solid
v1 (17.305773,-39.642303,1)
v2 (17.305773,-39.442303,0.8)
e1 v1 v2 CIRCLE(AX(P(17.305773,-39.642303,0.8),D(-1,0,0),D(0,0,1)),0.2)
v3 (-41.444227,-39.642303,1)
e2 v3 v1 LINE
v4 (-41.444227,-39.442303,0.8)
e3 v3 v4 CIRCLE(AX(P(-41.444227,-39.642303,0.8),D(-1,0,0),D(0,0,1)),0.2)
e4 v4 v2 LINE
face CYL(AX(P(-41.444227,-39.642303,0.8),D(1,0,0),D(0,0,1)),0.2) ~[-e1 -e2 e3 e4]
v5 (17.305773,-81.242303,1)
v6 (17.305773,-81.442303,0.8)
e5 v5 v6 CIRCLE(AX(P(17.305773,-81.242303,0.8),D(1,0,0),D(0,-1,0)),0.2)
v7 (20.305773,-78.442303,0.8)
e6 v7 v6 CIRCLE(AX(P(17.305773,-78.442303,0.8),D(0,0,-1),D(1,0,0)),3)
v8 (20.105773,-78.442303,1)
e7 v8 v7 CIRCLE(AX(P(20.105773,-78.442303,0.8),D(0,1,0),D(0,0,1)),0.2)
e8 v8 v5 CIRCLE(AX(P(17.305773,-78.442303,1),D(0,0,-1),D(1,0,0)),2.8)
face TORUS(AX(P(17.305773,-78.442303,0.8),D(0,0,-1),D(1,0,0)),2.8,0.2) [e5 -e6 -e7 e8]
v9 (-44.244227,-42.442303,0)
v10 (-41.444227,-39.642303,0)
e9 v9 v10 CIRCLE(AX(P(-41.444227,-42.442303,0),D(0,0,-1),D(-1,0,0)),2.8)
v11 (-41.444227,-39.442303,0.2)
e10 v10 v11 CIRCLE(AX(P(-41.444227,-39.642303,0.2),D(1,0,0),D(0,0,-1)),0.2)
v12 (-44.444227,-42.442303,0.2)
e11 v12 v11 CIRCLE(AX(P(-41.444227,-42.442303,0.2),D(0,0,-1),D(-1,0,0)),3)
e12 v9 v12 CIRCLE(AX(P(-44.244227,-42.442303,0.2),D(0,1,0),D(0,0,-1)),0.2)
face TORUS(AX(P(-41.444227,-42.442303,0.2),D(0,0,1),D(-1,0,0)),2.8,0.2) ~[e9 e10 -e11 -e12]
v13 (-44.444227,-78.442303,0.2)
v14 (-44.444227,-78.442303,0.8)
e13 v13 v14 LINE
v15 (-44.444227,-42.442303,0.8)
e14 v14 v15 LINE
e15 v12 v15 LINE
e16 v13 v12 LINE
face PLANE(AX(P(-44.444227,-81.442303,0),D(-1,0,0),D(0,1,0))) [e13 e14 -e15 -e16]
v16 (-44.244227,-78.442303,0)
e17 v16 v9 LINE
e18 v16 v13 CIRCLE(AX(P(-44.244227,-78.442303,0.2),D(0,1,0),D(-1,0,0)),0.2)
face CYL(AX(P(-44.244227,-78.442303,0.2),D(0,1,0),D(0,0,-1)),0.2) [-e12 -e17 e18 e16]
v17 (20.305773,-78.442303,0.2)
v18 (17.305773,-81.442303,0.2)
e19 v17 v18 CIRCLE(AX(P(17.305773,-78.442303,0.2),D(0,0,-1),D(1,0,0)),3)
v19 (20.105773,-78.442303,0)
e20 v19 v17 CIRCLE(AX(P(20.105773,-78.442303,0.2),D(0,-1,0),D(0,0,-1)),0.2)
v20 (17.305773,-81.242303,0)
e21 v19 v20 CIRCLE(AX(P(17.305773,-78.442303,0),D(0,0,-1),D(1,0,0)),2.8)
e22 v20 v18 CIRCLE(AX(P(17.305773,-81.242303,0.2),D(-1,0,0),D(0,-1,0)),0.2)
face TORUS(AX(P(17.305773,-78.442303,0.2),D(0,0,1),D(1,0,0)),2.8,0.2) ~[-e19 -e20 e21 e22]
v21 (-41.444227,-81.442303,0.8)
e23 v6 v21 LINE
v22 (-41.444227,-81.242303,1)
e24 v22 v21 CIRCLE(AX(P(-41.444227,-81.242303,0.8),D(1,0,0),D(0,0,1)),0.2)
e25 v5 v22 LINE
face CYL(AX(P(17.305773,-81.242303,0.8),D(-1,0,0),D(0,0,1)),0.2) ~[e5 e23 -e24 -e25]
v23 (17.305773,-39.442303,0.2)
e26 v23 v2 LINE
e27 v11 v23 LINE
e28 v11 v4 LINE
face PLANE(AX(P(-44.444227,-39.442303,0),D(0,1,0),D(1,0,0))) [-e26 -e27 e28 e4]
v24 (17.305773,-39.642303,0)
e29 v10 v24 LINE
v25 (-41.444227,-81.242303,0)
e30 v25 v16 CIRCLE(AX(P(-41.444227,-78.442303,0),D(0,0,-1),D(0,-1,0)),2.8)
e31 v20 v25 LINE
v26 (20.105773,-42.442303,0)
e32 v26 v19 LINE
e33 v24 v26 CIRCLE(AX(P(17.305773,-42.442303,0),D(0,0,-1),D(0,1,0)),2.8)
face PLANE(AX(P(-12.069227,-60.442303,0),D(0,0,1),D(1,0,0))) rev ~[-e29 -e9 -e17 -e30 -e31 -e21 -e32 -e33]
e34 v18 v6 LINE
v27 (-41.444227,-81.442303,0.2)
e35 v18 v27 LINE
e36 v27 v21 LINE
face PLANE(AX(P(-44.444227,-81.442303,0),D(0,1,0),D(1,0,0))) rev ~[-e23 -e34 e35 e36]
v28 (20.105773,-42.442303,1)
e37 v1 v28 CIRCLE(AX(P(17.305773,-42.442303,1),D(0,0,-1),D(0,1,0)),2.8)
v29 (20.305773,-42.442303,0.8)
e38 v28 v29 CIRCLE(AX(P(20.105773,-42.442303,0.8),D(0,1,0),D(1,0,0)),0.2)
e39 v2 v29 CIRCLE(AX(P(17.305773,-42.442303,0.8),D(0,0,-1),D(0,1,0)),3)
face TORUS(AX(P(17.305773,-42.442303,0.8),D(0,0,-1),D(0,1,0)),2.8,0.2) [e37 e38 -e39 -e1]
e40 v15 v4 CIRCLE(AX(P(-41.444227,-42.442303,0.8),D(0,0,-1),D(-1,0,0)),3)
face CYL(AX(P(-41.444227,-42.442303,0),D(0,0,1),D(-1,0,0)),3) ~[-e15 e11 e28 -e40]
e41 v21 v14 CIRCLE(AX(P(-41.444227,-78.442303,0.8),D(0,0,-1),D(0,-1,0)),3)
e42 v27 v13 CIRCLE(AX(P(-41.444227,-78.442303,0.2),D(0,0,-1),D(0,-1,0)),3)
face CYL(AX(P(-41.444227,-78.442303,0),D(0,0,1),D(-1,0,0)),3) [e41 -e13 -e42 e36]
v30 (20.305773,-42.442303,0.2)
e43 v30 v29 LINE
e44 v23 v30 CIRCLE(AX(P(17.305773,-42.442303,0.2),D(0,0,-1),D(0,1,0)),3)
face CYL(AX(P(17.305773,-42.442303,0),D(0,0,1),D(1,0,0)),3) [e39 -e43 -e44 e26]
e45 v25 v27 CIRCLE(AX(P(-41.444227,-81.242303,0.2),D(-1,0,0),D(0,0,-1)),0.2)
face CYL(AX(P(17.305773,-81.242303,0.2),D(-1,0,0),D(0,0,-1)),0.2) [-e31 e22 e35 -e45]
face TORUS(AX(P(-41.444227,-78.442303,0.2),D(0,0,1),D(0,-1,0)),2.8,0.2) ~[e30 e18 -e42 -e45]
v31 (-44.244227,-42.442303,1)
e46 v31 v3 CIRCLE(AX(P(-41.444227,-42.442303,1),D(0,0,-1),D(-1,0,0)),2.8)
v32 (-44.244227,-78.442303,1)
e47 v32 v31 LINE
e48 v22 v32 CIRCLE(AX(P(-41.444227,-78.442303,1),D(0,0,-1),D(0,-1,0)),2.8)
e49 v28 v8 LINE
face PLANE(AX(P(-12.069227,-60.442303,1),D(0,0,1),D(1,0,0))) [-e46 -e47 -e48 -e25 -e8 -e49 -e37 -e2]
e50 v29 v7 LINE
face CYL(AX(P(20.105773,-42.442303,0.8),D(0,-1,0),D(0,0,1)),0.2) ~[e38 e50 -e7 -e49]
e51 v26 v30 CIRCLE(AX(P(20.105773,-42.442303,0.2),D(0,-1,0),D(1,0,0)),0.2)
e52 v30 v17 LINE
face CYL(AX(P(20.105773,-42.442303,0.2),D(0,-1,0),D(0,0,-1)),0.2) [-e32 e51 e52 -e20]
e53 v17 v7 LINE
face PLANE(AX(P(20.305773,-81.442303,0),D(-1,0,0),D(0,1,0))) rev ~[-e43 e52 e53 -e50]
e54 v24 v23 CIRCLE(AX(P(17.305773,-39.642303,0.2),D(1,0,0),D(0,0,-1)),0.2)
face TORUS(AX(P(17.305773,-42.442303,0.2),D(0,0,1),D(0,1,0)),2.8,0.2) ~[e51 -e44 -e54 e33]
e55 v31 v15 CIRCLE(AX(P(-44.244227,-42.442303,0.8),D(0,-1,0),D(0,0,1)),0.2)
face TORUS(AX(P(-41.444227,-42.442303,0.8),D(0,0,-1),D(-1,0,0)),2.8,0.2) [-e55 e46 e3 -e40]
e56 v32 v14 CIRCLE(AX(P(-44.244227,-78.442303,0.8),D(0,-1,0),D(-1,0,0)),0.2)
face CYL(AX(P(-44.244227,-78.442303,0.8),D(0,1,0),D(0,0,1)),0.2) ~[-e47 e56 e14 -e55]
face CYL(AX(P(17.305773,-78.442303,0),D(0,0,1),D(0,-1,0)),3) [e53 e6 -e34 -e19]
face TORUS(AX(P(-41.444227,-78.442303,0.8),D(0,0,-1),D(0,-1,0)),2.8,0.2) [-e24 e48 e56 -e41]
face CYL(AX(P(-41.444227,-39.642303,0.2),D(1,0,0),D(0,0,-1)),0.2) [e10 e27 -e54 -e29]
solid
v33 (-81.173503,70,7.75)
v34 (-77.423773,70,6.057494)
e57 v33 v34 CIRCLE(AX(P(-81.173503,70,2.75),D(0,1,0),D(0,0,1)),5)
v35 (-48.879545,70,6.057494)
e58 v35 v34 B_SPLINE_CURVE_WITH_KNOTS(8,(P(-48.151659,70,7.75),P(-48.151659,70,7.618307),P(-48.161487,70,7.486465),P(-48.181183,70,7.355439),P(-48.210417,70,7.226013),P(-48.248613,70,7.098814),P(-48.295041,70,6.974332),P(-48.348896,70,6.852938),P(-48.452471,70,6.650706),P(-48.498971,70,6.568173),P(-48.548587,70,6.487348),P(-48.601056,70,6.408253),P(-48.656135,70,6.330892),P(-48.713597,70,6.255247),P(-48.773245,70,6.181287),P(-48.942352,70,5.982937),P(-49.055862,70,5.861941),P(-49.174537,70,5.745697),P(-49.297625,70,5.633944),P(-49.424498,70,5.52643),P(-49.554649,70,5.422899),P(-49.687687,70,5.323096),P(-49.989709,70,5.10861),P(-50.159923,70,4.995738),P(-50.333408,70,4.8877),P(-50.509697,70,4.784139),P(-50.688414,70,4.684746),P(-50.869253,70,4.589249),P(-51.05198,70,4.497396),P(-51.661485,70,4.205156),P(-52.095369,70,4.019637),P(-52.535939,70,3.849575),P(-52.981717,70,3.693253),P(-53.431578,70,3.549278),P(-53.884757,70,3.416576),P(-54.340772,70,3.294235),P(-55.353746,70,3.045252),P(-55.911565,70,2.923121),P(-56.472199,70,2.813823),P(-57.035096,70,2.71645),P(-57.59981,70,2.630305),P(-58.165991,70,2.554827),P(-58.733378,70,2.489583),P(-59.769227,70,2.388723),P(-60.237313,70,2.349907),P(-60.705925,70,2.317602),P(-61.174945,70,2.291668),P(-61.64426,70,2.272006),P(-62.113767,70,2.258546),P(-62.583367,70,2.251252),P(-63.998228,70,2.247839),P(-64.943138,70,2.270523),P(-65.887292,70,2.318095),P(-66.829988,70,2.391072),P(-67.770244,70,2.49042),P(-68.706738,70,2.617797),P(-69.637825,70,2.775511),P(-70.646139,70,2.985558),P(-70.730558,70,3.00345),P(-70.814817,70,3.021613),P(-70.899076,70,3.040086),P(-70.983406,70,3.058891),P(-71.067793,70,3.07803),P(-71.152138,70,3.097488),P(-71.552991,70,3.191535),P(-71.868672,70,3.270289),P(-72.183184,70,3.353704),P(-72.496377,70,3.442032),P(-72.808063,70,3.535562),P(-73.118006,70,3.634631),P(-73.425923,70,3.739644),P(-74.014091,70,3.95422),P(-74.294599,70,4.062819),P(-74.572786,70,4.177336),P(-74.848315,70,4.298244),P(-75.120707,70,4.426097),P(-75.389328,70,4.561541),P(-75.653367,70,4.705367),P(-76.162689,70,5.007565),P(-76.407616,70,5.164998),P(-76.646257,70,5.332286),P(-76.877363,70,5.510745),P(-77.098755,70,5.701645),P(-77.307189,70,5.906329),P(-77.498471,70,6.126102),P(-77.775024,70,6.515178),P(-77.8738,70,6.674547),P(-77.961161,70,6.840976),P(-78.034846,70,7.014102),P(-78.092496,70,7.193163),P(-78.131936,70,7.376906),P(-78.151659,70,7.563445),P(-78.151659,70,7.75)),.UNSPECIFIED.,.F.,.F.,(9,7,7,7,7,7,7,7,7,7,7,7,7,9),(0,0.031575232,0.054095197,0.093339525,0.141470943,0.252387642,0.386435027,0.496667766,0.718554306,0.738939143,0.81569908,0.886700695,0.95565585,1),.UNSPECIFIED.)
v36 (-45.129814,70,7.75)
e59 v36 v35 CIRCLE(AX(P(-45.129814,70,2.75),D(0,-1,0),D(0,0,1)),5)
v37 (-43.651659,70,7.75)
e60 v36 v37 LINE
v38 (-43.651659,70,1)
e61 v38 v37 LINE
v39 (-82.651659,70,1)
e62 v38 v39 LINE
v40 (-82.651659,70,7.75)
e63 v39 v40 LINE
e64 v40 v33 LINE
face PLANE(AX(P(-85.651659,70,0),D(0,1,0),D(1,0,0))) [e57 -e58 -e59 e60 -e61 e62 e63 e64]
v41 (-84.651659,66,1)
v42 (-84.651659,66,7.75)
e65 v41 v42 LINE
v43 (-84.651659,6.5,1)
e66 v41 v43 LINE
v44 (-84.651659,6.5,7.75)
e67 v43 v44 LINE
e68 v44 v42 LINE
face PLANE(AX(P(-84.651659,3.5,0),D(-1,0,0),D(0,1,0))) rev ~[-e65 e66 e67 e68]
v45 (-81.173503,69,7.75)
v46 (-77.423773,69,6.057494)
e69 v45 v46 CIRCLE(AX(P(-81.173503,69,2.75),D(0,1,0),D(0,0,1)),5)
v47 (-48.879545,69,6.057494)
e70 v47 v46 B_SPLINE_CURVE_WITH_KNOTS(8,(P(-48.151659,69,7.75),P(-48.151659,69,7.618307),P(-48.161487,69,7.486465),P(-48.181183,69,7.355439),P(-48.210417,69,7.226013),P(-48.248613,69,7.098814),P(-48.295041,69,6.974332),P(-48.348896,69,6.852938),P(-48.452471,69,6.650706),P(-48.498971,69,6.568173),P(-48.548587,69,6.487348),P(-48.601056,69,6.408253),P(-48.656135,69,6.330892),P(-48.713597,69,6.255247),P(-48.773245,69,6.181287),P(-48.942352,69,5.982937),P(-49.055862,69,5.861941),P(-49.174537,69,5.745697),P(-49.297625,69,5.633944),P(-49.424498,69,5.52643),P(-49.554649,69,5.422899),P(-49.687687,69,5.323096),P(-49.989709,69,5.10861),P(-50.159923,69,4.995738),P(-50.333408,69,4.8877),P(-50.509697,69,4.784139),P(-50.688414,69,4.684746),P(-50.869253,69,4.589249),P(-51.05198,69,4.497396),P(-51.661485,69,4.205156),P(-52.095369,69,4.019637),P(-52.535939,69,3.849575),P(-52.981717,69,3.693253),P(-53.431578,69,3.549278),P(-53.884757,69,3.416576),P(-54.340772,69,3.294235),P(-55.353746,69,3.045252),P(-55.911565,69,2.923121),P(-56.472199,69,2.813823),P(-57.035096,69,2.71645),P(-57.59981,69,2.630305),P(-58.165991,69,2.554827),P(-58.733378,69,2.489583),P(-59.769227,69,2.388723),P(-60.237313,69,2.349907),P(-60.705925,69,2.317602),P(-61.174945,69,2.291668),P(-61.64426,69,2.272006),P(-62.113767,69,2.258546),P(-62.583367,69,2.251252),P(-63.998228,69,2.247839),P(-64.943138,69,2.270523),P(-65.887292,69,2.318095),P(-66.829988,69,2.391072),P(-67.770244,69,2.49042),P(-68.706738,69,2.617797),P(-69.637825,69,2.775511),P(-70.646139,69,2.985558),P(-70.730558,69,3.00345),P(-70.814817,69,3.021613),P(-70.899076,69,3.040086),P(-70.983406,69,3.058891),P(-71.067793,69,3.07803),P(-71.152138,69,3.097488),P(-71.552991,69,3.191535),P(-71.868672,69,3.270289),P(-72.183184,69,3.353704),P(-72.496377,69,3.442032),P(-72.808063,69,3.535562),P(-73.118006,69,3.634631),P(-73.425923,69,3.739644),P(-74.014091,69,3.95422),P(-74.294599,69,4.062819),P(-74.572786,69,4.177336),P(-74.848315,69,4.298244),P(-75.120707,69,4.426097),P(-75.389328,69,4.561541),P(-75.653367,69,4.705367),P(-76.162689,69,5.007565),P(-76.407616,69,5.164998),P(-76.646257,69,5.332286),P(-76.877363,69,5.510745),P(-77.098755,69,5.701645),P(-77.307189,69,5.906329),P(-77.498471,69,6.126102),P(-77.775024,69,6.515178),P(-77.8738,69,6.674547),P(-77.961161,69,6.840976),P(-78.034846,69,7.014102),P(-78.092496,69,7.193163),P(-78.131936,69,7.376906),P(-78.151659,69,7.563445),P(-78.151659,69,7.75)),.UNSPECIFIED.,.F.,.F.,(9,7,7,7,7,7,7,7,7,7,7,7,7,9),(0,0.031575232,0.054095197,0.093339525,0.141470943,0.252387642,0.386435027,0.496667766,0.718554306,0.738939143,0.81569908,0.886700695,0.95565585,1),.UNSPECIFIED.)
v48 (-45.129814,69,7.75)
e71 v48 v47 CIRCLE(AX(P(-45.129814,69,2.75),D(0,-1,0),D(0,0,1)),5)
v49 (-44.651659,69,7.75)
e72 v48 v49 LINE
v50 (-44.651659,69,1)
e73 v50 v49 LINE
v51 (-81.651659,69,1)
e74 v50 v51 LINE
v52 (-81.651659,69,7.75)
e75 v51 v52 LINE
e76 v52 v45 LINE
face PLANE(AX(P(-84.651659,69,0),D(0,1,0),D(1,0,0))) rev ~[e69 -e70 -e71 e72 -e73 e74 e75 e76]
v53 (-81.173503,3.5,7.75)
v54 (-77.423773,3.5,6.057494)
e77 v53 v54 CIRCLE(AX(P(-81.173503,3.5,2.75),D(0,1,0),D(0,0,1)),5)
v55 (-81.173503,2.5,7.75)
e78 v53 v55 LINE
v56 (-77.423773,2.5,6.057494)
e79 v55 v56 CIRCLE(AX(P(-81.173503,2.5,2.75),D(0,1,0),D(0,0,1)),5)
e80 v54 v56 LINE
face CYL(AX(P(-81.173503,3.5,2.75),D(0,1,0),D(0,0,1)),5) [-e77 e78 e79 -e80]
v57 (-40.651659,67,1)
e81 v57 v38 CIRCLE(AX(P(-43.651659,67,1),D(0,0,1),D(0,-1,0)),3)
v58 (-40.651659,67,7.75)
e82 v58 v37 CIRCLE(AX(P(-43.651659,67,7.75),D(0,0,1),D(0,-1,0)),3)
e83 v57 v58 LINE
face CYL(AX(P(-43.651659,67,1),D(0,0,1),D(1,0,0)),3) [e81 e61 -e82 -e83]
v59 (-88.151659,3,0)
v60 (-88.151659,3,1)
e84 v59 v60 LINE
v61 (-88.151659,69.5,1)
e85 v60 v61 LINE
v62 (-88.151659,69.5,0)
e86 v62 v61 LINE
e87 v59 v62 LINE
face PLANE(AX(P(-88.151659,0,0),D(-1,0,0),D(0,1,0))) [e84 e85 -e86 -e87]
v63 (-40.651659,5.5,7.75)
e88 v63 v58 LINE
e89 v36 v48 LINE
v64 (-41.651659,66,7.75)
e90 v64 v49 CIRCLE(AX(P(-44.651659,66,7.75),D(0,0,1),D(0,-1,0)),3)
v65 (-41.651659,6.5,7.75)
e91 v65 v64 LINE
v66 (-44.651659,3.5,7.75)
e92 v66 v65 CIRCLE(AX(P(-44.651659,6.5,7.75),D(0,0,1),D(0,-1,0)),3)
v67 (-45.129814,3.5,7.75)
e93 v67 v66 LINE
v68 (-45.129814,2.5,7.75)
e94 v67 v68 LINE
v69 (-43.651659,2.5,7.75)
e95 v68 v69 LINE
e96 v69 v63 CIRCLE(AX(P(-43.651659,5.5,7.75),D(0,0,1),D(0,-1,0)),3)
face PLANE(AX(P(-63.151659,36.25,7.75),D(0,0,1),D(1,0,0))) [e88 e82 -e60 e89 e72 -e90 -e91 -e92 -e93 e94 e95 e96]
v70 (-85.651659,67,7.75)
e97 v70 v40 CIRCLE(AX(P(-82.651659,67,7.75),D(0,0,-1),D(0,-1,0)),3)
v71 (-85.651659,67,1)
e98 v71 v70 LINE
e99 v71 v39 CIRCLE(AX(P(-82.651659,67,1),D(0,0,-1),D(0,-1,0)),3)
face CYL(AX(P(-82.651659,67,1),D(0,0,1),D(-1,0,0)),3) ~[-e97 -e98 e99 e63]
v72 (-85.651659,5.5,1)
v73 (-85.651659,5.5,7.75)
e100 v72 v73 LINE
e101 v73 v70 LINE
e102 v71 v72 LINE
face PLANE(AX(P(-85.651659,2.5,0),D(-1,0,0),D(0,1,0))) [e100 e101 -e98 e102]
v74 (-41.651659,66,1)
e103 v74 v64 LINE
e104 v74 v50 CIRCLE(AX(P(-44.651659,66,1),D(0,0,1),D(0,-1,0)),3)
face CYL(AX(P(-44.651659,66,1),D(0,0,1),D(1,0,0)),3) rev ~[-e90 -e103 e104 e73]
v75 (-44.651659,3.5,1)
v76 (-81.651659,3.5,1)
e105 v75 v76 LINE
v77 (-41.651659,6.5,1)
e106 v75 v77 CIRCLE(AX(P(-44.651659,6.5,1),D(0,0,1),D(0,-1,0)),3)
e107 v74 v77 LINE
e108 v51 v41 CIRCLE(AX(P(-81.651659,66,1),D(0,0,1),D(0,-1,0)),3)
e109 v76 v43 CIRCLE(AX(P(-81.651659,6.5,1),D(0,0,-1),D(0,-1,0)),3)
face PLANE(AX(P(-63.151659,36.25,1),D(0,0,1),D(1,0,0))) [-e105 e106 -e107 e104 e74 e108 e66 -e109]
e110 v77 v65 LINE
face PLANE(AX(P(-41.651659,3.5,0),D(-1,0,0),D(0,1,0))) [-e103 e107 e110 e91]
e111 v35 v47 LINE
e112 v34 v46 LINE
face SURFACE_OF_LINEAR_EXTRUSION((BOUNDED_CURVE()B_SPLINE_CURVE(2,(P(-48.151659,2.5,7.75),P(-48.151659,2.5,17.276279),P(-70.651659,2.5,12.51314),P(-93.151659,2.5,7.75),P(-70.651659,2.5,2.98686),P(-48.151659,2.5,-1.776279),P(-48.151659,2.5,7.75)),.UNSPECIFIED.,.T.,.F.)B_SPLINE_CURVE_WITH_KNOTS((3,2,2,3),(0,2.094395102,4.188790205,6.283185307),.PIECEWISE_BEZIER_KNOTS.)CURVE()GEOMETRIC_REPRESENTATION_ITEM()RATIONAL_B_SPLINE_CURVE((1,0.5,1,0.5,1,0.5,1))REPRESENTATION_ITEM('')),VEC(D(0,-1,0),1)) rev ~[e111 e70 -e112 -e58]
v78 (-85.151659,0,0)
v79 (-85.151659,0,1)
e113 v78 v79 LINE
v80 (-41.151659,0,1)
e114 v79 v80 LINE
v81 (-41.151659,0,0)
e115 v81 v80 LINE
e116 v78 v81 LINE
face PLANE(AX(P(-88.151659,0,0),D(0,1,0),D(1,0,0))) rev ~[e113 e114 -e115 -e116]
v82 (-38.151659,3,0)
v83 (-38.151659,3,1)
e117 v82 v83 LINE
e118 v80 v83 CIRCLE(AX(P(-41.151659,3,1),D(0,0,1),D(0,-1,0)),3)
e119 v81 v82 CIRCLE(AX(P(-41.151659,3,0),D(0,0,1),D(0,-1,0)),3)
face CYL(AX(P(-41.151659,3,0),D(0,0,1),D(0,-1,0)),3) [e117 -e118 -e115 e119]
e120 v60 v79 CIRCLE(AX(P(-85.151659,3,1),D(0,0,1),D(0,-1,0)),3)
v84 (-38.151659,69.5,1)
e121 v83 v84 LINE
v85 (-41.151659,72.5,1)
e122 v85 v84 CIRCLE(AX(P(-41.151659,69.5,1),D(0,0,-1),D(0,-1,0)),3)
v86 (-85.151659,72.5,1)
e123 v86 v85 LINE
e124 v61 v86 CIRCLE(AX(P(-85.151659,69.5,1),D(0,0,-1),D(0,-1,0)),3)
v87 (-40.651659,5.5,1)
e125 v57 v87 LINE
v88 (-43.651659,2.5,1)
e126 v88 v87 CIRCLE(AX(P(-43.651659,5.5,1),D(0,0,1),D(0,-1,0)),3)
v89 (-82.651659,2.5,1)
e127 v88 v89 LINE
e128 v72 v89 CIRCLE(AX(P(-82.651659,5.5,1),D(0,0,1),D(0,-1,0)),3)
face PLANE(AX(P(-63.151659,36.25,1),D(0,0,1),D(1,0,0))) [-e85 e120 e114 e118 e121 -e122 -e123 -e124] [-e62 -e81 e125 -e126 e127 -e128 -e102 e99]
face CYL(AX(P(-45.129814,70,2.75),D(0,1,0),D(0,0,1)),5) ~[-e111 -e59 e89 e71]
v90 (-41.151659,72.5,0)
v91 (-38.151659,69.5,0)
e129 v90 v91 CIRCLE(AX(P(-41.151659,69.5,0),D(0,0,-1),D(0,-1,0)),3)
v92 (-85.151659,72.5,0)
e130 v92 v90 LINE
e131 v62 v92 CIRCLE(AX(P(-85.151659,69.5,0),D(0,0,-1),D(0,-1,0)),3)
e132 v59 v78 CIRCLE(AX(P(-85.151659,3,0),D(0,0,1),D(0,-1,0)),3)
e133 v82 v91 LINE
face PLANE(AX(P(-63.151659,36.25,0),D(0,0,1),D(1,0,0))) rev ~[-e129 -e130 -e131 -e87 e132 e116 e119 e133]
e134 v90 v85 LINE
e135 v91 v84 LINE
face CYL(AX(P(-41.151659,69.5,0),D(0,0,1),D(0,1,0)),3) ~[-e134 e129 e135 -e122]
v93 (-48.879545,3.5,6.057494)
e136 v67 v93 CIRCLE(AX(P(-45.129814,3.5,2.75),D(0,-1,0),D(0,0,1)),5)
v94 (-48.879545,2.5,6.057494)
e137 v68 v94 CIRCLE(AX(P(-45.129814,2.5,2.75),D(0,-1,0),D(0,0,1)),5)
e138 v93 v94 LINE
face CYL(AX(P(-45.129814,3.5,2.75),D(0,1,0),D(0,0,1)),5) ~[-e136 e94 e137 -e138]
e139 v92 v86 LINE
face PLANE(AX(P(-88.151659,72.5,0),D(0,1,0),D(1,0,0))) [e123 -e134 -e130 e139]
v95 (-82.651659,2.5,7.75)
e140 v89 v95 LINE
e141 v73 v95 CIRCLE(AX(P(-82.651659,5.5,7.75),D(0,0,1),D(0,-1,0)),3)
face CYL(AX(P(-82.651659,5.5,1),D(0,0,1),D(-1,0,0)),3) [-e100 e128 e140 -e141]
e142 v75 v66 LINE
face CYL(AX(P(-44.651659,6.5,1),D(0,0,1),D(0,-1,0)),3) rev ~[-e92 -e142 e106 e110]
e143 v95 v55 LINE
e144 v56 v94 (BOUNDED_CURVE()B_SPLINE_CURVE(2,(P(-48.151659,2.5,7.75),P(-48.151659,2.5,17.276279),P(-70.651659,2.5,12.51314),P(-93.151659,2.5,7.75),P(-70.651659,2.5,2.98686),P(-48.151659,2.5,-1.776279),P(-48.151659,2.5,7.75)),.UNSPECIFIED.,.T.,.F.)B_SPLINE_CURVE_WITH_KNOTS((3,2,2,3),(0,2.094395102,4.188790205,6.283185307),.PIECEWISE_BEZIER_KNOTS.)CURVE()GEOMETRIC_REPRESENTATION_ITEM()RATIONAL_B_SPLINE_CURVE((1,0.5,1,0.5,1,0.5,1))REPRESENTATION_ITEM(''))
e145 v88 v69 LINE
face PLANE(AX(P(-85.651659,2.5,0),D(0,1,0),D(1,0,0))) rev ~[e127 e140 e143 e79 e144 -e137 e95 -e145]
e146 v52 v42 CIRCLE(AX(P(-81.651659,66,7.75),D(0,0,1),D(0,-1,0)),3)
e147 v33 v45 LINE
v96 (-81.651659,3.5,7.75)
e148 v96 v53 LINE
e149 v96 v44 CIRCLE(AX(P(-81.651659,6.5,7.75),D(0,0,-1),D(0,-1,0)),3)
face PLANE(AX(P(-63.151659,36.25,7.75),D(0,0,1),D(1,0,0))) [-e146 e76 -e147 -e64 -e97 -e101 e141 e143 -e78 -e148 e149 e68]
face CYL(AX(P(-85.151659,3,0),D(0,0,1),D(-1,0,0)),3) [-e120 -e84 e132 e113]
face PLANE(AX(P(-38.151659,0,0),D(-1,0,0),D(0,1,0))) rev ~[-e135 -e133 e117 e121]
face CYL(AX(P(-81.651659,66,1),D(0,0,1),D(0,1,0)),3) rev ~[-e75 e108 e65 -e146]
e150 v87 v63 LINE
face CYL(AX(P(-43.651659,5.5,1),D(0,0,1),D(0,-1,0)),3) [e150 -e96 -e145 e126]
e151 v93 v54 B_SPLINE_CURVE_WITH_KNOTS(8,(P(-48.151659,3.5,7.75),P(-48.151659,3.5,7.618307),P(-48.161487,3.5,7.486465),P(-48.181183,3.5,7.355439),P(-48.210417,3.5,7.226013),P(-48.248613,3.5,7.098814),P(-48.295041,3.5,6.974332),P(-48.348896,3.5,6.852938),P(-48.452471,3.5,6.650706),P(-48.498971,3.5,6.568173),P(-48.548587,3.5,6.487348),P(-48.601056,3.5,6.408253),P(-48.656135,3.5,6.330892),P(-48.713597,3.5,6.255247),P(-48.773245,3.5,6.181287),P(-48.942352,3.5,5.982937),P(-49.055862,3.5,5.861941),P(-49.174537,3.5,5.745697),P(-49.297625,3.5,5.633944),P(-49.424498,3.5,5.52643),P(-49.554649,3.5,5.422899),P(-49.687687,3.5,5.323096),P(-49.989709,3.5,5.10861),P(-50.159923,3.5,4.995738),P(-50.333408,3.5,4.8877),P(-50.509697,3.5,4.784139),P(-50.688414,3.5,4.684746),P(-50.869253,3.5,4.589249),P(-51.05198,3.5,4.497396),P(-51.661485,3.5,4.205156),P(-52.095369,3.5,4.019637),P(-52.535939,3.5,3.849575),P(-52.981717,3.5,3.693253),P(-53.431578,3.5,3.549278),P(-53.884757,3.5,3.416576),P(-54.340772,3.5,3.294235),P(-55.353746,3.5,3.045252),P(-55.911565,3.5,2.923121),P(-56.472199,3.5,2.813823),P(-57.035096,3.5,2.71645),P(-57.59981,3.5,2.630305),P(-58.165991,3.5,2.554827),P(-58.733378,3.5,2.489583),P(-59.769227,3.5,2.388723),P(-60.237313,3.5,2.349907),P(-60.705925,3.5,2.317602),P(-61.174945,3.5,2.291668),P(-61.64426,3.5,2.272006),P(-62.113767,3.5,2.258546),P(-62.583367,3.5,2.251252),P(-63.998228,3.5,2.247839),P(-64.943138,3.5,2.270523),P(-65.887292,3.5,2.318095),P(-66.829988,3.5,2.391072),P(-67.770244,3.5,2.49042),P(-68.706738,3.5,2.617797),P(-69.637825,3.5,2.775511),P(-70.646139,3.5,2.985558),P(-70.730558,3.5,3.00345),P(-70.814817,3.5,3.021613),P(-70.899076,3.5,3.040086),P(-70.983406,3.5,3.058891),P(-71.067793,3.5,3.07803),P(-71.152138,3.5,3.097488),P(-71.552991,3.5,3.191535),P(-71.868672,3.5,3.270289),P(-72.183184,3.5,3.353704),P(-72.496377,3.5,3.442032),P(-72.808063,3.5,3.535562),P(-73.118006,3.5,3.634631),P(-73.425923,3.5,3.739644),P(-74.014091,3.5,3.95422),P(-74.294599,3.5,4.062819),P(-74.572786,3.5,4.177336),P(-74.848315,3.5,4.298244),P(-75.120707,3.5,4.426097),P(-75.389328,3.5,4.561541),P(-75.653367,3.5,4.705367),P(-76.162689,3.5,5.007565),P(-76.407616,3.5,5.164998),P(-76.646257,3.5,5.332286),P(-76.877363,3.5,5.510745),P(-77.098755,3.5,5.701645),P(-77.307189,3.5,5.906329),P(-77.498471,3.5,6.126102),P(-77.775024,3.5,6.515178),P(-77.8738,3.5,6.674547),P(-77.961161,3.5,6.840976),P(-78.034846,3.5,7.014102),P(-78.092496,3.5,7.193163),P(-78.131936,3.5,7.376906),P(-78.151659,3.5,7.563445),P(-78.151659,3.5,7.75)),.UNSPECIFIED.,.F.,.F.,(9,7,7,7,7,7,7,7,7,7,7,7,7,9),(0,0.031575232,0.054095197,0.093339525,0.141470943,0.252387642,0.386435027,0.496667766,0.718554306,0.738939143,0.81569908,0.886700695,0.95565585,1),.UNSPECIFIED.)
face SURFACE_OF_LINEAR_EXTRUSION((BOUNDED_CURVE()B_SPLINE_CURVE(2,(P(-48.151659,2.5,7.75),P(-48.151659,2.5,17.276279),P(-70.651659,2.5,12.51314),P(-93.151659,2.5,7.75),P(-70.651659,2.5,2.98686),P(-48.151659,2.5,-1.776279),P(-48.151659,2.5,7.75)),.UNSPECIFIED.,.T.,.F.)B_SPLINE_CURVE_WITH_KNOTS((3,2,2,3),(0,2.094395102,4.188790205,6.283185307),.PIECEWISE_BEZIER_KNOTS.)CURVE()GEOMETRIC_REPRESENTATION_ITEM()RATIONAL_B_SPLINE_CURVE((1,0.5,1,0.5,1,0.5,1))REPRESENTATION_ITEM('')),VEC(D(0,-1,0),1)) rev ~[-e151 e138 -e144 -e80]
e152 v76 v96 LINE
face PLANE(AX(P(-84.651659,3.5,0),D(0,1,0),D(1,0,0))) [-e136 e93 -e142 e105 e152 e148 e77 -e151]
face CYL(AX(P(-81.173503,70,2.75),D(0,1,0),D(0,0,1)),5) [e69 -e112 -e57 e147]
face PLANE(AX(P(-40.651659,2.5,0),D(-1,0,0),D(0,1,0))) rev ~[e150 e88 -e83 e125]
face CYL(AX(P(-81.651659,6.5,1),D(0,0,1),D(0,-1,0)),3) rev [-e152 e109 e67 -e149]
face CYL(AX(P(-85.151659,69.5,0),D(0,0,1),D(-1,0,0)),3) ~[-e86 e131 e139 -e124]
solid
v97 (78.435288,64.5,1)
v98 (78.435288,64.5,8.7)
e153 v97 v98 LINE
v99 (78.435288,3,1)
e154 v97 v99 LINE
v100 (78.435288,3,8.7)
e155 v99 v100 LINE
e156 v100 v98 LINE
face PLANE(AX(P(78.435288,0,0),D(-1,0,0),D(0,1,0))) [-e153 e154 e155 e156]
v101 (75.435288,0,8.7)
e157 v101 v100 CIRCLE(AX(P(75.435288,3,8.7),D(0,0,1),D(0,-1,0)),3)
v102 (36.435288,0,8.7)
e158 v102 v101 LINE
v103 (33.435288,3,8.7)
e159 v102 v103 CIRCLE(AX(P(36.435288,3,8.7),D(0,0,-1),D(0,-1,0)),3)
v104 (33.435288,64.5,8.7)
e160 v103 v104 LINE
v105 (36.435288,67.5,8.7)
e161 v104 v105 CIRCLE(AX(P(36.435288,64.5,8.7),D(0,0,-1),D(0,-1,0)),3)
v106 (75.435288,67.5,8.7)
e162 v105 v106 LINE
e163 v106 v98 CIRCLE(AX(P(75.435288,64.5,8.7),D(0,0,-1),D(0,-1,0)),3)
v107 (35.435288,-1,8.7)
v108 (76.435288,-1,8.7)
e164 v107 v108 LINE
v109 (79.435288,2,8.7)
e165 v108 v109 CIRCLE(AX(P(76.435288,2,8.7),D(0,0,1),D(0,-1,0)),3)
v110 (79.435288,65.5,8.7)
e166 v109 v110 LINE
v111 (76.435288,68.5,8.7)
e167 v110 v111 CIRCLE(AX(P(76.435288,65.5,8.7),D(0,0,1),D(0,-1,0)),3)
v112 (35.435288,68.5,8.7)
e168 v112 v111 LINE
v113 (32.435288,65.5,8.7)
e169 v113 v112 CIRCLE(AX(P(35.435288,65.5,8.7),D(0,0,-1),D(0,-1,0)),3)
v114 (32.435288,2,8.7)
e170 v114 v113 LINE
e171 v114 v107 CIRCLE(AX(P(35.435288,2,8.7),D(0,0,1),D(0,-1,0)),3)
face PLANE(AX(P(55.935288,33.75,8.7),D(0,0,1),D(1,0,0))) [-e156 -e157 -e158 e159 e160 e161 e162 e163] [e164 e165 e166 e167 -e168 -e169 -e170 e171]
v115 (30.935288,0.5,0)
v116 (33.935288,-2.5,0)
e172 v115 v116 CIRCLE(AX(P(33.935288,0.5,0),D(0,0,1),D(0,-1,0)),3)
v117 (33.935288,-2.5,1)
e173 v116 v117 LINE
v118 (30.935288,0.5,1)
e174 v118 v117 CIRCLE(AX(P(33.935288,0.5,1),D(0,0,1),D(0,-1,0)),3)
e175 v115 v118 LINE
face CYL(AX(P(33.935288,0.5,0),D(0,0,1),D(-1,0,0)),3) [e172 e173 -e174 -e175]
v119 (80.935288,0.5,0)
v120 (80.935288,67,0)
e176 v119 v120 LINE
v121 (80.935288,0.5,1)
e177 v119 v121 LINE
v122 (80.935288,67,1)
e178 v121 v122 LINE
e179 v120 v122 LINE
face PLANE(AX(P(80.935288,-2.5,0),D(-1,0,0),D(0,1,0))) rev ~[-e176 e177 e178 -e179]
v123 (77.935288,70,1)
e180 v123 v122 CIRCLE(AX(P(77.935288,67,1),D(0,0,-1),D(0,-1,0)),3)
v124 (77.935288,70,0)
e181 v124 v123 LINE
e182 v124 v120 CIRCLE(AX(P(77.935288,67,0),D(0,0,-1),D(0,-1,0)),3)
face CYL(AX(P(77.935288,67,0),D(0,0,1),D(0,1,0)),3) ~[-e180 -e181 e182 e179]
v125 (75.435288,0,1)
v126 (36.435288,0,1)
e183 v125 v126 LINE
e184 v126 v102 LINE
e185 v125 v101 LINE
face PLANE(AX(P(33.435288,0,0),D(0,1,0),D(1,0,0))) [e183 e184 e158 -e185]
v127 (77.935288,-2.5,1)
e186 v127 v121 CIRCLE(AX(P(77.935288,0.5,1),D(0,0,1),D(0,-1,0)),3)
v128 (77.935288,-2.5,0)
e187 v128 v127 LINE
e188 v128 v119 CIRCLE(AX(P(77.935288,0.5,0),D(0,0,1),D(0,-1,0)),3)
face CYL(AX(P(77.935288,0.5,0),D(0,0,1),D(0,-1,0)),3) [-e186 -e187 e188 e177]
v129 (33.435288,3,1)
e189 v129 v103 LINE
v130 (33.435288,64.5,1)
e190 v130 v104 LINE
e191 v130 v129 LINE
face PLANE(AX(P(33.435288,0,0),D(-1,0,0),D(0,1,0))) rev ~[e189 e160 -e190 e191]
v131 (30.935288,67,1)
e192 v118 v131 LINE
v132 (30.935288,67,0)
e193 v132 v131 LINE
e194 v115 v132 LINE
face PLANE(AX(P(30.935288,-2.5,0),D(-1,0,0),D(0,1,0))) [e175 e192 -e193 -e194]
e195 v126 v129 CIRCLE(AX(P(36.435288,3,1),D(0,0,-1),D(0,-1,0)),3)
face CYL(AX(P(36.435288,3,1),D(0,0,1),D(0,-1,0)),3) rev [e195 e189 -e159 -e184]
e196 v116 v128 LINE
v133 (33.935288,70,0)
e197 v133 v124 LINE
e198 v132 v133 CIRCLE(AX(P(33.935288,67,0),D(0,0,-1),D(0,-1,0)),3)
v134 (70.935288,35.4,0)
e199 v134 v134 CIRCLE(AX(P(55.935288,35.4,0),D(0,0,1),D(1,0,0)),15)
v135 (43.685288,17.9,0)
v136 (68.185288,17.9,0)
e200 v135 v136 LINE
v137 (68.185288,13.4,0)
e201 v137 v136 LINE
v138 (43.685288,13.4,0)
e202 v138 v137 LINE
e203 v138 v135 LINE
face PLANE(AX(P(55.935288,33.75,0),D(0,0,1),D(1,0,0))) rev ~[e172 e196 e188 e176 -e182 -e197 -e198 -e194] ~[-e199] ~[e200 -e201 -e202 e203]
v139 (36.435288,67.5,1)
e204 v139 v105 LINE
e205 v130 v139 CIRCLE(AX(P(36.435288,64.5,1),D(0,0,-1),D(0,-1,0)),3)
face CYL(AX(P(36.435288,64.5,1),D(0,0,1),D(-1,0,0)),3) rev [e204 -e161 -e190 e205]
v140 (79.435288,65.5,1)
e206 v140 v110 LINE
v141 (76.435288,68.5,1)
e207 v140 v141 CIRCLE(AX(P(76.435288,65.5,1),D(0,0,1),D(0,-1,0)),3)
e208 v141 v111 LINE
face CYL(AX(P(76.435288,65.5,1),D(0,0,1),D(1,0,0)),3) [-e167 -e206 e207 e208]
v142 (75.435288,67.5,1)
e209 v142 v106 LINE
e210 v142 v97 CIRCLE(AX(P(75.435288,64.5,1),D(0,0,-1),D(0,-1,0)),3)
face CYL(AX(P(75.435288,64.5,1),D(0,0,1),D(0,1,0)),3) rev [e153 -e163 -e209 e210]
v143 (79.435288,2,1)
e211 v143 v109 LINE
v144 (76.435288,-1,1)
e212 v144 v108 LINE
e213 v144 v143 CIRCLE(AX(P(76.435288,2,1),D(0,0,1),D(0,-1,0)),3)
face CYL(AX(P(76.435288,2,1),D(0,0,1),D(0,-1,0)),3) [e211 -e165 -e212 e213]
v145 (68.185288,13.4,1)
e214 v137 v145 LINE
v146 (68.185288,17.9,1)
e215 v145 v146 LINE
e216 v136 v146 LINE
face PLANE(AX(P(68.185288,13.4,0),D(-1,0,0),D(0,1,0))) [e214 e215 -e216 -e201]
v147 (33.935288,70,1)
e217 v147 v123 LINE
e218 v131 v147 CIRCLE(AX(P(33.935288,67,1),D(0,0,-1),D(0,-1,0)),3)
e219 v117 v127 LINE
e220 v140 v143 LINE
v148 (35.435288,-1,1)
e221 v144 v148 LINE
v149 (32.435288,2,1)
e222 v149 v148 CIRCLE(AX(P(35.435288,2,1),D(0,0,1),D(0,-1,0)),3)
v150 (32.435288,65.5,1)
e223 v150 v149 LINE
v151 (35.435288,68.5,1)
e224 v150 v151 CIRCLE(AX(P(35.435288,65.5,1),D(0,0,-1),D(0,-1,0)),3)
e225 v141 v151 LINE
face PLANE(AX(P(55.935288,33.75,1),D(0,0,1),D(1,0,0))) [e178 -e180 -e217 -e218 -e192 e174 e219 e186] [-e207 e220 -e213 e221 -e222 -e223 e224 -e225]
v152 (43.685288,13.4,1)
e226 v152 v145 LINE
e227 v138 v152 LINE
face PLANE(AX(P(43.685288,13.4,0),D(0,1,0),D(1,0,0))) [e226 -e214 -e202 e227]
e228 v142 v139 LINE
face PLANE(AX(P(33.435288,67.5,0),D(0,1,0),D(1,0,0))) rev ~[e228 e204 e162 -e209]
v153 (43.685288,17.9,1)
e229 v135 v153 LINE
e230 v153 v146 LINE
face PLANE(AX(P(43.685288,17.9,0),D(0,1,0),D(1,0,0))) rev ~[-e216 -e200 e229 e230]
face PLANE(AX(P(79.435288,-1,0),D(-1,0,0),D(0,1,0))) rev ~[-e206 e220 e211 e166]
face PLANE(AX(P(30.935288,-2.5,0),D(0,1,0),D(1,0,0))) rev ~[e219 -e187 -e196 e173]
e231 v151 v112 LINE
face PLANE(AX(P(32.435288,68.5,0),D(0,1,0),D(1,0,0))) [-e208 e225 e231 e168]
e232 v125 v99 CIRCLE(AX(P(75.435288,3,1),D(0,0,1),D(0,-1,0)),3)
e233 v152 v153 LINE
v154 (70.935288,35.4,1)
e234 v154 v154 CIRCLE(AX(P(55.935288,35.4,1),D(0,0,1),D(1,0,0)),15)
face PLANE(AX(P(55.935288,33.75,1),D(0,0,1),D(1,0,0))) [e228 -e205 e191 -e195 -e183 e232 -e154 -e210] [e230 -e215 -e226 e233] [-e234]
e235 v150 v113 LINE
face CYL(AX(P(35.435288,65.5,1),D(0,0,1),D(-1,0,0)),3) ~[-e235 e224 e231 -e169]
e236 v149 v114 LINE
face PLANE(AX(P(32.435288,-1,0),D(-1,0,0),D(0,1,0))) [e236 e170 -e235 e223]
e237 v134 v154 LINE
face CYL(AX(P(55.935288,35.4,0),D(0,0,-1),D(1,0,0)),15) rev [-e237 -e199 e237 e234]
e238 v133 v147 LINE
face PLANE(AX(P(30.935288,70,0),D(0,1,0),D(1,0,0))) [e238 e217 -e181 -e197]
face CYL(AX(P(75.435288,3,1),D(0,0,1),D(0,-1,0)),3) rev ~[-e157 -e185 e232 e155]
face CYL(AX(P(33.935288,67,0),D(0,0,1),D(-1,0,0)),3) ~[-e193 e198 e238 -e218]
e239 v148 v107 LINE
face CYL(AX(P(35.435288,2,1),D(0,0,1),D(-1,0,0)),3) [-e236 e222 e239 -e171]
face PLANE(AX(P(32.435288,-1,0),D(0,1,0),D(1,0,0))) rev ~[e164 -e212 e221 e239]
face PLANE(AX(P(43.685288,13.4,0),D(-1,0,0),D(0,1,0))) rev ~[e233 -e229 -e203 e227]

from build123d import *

# Parameters (mm, degrees)
F0_W        = 64.75
F0_H        = 42
F1_DEPTH    = 1
F2_R        = 3
F3_R        = 0.2
F0_W_2      = 50
F0_H_2      = 72.5
F0_W_3      = 45
F0_H_3      = 67.5
F0_W_4      = 43
F0_H_4      = 65.5
F4_DEPTH    = 1
F5_DEPTH    = 7.75
F6_R        = 3
F8_DEPTH    = 70.001
F9_T1_DEPTH = 1
F9_T3_DEPTH = 1
F0_W_5      = 47
F0_H_5      = 69.5
F0_W_6      = 24.5
F0_H_6      = 4.5
F0_R        = 15
F10_DEPTH   = 1
F11_DEPTH   = 8.7
F12_R       = 3


# Not quite as in the source:
# - a fillet or chamfer that OpenCascade refuses, or shapes differently, is made with other operations: its cross-section is extruded or revolved along the edge and cut away or added


with BuildPart() as f1:
    # F0 (on Top) → F1 (new body)
    with BuildSketch(Plane.XY):
        with Locations((-12.0692265069, -60.4423025408)):
            Rectangle(F0_W, F0_H)
    extrude(amount=F1_DEPTH)

    # F2
    f2_edges = [f1.edges().sort_by_distance(p)[0] for p in [
        (-44.444227, -39.442303, 0.5),
        (-44.444227, -81.442303, 0.5),
        (20.305773, -81.442303, 0.5),
        (20.305773, -39.442303, 0.5),
    ]]
    fillet(f2_edges, radius=F2_R)

    # F3
    f3_edges = [f1.edges().sort_by_distance(p)[0] for p in [
        (-12.069227, -39.442303, 1),
        (19.427094, -40.320982, 1),
        (-43.565547, -40.320982, 1),
        (20.305773, -60.442303, 1),
        (-44.444227, -60.442303, 1),
        (19.427094, -80.563623, 1),
        (-43.565547, -80.563623, 1),
        (-12.069227, -81.442303, 1),
        (-12.069227, -39.442303, 0),
        (19.427094, -40.320982, 0),
        (-43.565547, -40.320982, 0),
        (20.305773, -60.442303, 0),
        (-44.444227, -60.442303, 0),
        (19.427094, -80.563623, 0),
        (-43.565547, -80.563623, 0),
        (-12.069227, -81.442303, 0),
    ]]
    fillet(f3_edges, radius=F3_R)


with BuildPart() as f4:
    # F0 (on Top) → F4 (new body)
    with BuildSketch(Plane.XY):
        with Locations((-63.1516585421, 36.25)):
            Rectangle(F0_W_2, F0_H_2)
        with Locations((-63.1516585421, 36.25)):
            Rectangle(F0_W_3, F0_H_3, mode=Mode.SUBTRACT)
        with Locations((-63.1516585421, 36.25)):
            Rectangle(F0_W_3, F0_H_3)
        with Locations((-63.1516585421, 36.25)):
            Rectangle(F0_W_4, F0_H_4, mode=Mode.SUBTRACT)
        with Locations((-63.1516585421, 36.25)):
            Rectangle(F0_W_4, F0_H_4)
    extrude(amount=F4_DEPTH)

    # F0 (on Top) → F5 (join)
    with BuildSketch(Plane.XY):
        with Locations((-63.1516585421, 36.25)):
            Rectangle(F0_W_3, F0_H_3)
        with Locations((-63.1516585421, 36.25)):
            Rectangle(F0_W_4, F0_H_4, mode=Mode.SUBTRACT)
    extrude(amount=F5_DEPTH)

    # F6
    f6_edges = [f4.edges().sort_by_distance(p)[0] for p in [
        (-85.651659, 2.5, 4.375),
        (-40.651659, 2.5, 4.375),
        (-85.651659, 70, 4.375),
        (-40.651659, 70, 4.375),
        (-88.151659, 72.5, 0.5),
        (-38.151659, 72.5, 0.5),
        (-38.151659, 0, 0.5),
        (-88.151659, 0, 0.5),
        (-41.651659, 3.5, 4.375),
        (-84.651659, 3.5, 4.375),
        (-84.651659, 69, 4.375),
        (-41.651659, 69, 4.375),
    ]]
    fillet(f6_edges, radius=F6_R)

    # F7 (on face) → F8 (cut, through all)
    with BuildSketch(Plane.XZ.offset(-2.5)):
        with BuildLine():
            add(Edge.make_bspline(
                [(-48.1516585421, 7.75), (-48.1516585421, 17.2762794416), (-70.6516585421, 12.5131397208), (-93.1516585421, 7.75), (-70.6516585421, 2.9868602792), (-48.1516585421, -1.7762794416), (-48.1516585421, 7.75)],
                knots=[0, 0, 0, 2.0943951024, 2.0943951024, 4.1887902048, 4.1887902048, 6.2831853072, 6.2831853072, 6.2831853072], degree=2, weights=[1, 0.5, 1, 0.5, 1, 0.5, 1]))
        make_face()
    extrude(amount=-F8_DEPTH, mode=Mode.SUBTRACT)

    # F9: fillet of radius 5 on 4 edges, made by hand

    # F9_s2 → F9_t1 (cut)
    with BuildSketch(Plane.XZ.offset(-70)):
        with BuildLine():
            ThreePointArc((-81.1735034535, 7.75), (-79.116499703, 7.3072728216), (-77.423772539, 6.057494228))
            Line((-77.423772539, 6.057494228), (-77.3487779207, 6.1236441126))
            ThreePointArc((-77.3487779207, 6.1236441126), (-77.8507909347, 6.8746512138), (-78.0516585421, 7.75))
            Line((-78.0516585421, 7.75), (-78.1516585421, 7.85))
            Line((-78.1516585421, 7.85), (-81.1735034535, 7.85))
            Line((-81.1735034535, 7.85), (-81.1735034535, 7.75))
        make_face()
        with BuildLine():
            ThreePointArc((-45.1298136307, 7.75), (-47.1868173813, 7.3072728216), (-48.8795445453, 6.057494228))
            Line((-48.8795445453, 6.057494228), (-48.9545391636, 6.1236441126))
            ThreePointArc((-48.9545391636, 6.1236441126), (-48.4525261496, 6.8746512138), (-48.2516585421, 7.75))
            Line((-48.2516585421, 7.75), (-48.1516585421, 7.85))
            Line((-48.1516585421, 7.85), (-45.1298136307, 7.85))
            Line((-45.1298136307, 7.85), (-45.1298136307, 7.75))
        make_face()
    extrude(amount=F9_T1_DEPTH, mode=Mode.SUBTRACT)

    # F9_s4 → F9_t3 (cut)
    with BuildSketch(Plane.XZ.offset(-3.5)):
        with BuildLine():
            ThreePointArc((-81.1735034535, 7.75), (-79.116499703, 7.3072728216), (-77.423772539, 6.057494228))
            Line((-77.423772539, 6.057494228), (-77.3487779207, 6.1236441126))
            ThreePointArc((-77.3487779207, 6.1236441126), (-77.8507909347, 6.8746512138), (-78.0516585421, 7.75))
            Line((-78.0516585421, 7.75), (-78.1516585421, 7.85))
            Line((-78.1516585421, 7.85), (-81.1735034535, 7.85))
            Line((-81.1735034535, 7.85), (-81.1735034535, 7.75))
        make_face()
        with BuildLine():
            ThreePointArc((-45.1298136307, 7.75), (-47.1868173813, 7.3072728216), (-48.8795445453, 6.057494228))
            Line((-48.8795445453, 6.057494228), (-48.9545391636, 6.1236441126))
            ThreePointArc((-48.9545391636, 6.1236441126), (-48.4525261496, 6.8746512138), (-48.2516585421, 7.75))
            Line((-48.2516585421, 7.75), (-48.1516585421, 7.85))
            Line((-48.1516585421, 7.85), (-45.1298136307, 7.85))
            Line((-45.1298136307, 7.85), (-45.1298136307, 7.75))
        make_face()
    extrude(amount=F9_T3_DEPTH, mode=Mode.SUBTRACT)


with BuildPart() as f10:
    # F0 (on Top) → F10 (new body)
    with BuildSketch(Plane.XY):
        with Locations((55.9352879792, 33.75)):
            Rectangle(F0_W_2, F0_H_2)
        with Locations((55.9352879792, 33.75)):
            Rectangle(F0_W_5, F0_H_5, mode=Mode.SUBTRACT)
        with Locations((55.9352879792, 33.75)):
            Rectangle(F0_W_5, F0_H_5)
        with Locations((55.9352879792, 33.75)):
            Rectangle(F0_W_3, F0_H_3, mode=Mode.SUBTRACT)
        with Locations((55.9352879792, 33.75)):
            Rectangle(F0_W_3, F0_H_3)
        with Locations((55.9352879792, 15.65)):
            Rectangle(F0_W_6, F0_H_6, mode=Mode.SUBTRACT)
        with Locations((55.9352879792, 35.4)):
            Circle(F0_R, mode=Mode.SUBTRACT)
    extrude(amount=F10_DEPTH)

    # F0 (on Top) → F11 (join)
    with BuildSketch(Plane.XY):
        with Locations((55.9352879792, 33.75)):
            Rectangle(F0_W_5, F0_H_5)
        with Locations((55.9352879792, 33.75)):
            Rectangle(F0_W_3, F0_H_3, mode=Mode.SUBTRACT)
    extrude(amount=F11_DEPTH)

    # F12
    f12_edges = [f10.edges().sort_by_distance(p)[0] for p in [
        (80.935288, -2.5, 0.5),
        (79.435288, -1, 4.85),
        (78.435288, 0, 4.85),
        (30.935288, -2.5, 0.5),
        (32.435288, -1, 4.85),
        (33.435288, 0, 4.85),
        (33.435288, 67.5, 4.85),
        (78.435288, 67.5, 4.85),
        (32.435288, 68.5, 4.85),
        (30.935288, 70, 0.5),
        (80.935288, 70, 0.5),
        (79.435288, 68.5, 4.85),
    ]]
    fillet(f12_edges, radius=F12_R)


solid = Compound([f1.part, f4.part, f10.part])
